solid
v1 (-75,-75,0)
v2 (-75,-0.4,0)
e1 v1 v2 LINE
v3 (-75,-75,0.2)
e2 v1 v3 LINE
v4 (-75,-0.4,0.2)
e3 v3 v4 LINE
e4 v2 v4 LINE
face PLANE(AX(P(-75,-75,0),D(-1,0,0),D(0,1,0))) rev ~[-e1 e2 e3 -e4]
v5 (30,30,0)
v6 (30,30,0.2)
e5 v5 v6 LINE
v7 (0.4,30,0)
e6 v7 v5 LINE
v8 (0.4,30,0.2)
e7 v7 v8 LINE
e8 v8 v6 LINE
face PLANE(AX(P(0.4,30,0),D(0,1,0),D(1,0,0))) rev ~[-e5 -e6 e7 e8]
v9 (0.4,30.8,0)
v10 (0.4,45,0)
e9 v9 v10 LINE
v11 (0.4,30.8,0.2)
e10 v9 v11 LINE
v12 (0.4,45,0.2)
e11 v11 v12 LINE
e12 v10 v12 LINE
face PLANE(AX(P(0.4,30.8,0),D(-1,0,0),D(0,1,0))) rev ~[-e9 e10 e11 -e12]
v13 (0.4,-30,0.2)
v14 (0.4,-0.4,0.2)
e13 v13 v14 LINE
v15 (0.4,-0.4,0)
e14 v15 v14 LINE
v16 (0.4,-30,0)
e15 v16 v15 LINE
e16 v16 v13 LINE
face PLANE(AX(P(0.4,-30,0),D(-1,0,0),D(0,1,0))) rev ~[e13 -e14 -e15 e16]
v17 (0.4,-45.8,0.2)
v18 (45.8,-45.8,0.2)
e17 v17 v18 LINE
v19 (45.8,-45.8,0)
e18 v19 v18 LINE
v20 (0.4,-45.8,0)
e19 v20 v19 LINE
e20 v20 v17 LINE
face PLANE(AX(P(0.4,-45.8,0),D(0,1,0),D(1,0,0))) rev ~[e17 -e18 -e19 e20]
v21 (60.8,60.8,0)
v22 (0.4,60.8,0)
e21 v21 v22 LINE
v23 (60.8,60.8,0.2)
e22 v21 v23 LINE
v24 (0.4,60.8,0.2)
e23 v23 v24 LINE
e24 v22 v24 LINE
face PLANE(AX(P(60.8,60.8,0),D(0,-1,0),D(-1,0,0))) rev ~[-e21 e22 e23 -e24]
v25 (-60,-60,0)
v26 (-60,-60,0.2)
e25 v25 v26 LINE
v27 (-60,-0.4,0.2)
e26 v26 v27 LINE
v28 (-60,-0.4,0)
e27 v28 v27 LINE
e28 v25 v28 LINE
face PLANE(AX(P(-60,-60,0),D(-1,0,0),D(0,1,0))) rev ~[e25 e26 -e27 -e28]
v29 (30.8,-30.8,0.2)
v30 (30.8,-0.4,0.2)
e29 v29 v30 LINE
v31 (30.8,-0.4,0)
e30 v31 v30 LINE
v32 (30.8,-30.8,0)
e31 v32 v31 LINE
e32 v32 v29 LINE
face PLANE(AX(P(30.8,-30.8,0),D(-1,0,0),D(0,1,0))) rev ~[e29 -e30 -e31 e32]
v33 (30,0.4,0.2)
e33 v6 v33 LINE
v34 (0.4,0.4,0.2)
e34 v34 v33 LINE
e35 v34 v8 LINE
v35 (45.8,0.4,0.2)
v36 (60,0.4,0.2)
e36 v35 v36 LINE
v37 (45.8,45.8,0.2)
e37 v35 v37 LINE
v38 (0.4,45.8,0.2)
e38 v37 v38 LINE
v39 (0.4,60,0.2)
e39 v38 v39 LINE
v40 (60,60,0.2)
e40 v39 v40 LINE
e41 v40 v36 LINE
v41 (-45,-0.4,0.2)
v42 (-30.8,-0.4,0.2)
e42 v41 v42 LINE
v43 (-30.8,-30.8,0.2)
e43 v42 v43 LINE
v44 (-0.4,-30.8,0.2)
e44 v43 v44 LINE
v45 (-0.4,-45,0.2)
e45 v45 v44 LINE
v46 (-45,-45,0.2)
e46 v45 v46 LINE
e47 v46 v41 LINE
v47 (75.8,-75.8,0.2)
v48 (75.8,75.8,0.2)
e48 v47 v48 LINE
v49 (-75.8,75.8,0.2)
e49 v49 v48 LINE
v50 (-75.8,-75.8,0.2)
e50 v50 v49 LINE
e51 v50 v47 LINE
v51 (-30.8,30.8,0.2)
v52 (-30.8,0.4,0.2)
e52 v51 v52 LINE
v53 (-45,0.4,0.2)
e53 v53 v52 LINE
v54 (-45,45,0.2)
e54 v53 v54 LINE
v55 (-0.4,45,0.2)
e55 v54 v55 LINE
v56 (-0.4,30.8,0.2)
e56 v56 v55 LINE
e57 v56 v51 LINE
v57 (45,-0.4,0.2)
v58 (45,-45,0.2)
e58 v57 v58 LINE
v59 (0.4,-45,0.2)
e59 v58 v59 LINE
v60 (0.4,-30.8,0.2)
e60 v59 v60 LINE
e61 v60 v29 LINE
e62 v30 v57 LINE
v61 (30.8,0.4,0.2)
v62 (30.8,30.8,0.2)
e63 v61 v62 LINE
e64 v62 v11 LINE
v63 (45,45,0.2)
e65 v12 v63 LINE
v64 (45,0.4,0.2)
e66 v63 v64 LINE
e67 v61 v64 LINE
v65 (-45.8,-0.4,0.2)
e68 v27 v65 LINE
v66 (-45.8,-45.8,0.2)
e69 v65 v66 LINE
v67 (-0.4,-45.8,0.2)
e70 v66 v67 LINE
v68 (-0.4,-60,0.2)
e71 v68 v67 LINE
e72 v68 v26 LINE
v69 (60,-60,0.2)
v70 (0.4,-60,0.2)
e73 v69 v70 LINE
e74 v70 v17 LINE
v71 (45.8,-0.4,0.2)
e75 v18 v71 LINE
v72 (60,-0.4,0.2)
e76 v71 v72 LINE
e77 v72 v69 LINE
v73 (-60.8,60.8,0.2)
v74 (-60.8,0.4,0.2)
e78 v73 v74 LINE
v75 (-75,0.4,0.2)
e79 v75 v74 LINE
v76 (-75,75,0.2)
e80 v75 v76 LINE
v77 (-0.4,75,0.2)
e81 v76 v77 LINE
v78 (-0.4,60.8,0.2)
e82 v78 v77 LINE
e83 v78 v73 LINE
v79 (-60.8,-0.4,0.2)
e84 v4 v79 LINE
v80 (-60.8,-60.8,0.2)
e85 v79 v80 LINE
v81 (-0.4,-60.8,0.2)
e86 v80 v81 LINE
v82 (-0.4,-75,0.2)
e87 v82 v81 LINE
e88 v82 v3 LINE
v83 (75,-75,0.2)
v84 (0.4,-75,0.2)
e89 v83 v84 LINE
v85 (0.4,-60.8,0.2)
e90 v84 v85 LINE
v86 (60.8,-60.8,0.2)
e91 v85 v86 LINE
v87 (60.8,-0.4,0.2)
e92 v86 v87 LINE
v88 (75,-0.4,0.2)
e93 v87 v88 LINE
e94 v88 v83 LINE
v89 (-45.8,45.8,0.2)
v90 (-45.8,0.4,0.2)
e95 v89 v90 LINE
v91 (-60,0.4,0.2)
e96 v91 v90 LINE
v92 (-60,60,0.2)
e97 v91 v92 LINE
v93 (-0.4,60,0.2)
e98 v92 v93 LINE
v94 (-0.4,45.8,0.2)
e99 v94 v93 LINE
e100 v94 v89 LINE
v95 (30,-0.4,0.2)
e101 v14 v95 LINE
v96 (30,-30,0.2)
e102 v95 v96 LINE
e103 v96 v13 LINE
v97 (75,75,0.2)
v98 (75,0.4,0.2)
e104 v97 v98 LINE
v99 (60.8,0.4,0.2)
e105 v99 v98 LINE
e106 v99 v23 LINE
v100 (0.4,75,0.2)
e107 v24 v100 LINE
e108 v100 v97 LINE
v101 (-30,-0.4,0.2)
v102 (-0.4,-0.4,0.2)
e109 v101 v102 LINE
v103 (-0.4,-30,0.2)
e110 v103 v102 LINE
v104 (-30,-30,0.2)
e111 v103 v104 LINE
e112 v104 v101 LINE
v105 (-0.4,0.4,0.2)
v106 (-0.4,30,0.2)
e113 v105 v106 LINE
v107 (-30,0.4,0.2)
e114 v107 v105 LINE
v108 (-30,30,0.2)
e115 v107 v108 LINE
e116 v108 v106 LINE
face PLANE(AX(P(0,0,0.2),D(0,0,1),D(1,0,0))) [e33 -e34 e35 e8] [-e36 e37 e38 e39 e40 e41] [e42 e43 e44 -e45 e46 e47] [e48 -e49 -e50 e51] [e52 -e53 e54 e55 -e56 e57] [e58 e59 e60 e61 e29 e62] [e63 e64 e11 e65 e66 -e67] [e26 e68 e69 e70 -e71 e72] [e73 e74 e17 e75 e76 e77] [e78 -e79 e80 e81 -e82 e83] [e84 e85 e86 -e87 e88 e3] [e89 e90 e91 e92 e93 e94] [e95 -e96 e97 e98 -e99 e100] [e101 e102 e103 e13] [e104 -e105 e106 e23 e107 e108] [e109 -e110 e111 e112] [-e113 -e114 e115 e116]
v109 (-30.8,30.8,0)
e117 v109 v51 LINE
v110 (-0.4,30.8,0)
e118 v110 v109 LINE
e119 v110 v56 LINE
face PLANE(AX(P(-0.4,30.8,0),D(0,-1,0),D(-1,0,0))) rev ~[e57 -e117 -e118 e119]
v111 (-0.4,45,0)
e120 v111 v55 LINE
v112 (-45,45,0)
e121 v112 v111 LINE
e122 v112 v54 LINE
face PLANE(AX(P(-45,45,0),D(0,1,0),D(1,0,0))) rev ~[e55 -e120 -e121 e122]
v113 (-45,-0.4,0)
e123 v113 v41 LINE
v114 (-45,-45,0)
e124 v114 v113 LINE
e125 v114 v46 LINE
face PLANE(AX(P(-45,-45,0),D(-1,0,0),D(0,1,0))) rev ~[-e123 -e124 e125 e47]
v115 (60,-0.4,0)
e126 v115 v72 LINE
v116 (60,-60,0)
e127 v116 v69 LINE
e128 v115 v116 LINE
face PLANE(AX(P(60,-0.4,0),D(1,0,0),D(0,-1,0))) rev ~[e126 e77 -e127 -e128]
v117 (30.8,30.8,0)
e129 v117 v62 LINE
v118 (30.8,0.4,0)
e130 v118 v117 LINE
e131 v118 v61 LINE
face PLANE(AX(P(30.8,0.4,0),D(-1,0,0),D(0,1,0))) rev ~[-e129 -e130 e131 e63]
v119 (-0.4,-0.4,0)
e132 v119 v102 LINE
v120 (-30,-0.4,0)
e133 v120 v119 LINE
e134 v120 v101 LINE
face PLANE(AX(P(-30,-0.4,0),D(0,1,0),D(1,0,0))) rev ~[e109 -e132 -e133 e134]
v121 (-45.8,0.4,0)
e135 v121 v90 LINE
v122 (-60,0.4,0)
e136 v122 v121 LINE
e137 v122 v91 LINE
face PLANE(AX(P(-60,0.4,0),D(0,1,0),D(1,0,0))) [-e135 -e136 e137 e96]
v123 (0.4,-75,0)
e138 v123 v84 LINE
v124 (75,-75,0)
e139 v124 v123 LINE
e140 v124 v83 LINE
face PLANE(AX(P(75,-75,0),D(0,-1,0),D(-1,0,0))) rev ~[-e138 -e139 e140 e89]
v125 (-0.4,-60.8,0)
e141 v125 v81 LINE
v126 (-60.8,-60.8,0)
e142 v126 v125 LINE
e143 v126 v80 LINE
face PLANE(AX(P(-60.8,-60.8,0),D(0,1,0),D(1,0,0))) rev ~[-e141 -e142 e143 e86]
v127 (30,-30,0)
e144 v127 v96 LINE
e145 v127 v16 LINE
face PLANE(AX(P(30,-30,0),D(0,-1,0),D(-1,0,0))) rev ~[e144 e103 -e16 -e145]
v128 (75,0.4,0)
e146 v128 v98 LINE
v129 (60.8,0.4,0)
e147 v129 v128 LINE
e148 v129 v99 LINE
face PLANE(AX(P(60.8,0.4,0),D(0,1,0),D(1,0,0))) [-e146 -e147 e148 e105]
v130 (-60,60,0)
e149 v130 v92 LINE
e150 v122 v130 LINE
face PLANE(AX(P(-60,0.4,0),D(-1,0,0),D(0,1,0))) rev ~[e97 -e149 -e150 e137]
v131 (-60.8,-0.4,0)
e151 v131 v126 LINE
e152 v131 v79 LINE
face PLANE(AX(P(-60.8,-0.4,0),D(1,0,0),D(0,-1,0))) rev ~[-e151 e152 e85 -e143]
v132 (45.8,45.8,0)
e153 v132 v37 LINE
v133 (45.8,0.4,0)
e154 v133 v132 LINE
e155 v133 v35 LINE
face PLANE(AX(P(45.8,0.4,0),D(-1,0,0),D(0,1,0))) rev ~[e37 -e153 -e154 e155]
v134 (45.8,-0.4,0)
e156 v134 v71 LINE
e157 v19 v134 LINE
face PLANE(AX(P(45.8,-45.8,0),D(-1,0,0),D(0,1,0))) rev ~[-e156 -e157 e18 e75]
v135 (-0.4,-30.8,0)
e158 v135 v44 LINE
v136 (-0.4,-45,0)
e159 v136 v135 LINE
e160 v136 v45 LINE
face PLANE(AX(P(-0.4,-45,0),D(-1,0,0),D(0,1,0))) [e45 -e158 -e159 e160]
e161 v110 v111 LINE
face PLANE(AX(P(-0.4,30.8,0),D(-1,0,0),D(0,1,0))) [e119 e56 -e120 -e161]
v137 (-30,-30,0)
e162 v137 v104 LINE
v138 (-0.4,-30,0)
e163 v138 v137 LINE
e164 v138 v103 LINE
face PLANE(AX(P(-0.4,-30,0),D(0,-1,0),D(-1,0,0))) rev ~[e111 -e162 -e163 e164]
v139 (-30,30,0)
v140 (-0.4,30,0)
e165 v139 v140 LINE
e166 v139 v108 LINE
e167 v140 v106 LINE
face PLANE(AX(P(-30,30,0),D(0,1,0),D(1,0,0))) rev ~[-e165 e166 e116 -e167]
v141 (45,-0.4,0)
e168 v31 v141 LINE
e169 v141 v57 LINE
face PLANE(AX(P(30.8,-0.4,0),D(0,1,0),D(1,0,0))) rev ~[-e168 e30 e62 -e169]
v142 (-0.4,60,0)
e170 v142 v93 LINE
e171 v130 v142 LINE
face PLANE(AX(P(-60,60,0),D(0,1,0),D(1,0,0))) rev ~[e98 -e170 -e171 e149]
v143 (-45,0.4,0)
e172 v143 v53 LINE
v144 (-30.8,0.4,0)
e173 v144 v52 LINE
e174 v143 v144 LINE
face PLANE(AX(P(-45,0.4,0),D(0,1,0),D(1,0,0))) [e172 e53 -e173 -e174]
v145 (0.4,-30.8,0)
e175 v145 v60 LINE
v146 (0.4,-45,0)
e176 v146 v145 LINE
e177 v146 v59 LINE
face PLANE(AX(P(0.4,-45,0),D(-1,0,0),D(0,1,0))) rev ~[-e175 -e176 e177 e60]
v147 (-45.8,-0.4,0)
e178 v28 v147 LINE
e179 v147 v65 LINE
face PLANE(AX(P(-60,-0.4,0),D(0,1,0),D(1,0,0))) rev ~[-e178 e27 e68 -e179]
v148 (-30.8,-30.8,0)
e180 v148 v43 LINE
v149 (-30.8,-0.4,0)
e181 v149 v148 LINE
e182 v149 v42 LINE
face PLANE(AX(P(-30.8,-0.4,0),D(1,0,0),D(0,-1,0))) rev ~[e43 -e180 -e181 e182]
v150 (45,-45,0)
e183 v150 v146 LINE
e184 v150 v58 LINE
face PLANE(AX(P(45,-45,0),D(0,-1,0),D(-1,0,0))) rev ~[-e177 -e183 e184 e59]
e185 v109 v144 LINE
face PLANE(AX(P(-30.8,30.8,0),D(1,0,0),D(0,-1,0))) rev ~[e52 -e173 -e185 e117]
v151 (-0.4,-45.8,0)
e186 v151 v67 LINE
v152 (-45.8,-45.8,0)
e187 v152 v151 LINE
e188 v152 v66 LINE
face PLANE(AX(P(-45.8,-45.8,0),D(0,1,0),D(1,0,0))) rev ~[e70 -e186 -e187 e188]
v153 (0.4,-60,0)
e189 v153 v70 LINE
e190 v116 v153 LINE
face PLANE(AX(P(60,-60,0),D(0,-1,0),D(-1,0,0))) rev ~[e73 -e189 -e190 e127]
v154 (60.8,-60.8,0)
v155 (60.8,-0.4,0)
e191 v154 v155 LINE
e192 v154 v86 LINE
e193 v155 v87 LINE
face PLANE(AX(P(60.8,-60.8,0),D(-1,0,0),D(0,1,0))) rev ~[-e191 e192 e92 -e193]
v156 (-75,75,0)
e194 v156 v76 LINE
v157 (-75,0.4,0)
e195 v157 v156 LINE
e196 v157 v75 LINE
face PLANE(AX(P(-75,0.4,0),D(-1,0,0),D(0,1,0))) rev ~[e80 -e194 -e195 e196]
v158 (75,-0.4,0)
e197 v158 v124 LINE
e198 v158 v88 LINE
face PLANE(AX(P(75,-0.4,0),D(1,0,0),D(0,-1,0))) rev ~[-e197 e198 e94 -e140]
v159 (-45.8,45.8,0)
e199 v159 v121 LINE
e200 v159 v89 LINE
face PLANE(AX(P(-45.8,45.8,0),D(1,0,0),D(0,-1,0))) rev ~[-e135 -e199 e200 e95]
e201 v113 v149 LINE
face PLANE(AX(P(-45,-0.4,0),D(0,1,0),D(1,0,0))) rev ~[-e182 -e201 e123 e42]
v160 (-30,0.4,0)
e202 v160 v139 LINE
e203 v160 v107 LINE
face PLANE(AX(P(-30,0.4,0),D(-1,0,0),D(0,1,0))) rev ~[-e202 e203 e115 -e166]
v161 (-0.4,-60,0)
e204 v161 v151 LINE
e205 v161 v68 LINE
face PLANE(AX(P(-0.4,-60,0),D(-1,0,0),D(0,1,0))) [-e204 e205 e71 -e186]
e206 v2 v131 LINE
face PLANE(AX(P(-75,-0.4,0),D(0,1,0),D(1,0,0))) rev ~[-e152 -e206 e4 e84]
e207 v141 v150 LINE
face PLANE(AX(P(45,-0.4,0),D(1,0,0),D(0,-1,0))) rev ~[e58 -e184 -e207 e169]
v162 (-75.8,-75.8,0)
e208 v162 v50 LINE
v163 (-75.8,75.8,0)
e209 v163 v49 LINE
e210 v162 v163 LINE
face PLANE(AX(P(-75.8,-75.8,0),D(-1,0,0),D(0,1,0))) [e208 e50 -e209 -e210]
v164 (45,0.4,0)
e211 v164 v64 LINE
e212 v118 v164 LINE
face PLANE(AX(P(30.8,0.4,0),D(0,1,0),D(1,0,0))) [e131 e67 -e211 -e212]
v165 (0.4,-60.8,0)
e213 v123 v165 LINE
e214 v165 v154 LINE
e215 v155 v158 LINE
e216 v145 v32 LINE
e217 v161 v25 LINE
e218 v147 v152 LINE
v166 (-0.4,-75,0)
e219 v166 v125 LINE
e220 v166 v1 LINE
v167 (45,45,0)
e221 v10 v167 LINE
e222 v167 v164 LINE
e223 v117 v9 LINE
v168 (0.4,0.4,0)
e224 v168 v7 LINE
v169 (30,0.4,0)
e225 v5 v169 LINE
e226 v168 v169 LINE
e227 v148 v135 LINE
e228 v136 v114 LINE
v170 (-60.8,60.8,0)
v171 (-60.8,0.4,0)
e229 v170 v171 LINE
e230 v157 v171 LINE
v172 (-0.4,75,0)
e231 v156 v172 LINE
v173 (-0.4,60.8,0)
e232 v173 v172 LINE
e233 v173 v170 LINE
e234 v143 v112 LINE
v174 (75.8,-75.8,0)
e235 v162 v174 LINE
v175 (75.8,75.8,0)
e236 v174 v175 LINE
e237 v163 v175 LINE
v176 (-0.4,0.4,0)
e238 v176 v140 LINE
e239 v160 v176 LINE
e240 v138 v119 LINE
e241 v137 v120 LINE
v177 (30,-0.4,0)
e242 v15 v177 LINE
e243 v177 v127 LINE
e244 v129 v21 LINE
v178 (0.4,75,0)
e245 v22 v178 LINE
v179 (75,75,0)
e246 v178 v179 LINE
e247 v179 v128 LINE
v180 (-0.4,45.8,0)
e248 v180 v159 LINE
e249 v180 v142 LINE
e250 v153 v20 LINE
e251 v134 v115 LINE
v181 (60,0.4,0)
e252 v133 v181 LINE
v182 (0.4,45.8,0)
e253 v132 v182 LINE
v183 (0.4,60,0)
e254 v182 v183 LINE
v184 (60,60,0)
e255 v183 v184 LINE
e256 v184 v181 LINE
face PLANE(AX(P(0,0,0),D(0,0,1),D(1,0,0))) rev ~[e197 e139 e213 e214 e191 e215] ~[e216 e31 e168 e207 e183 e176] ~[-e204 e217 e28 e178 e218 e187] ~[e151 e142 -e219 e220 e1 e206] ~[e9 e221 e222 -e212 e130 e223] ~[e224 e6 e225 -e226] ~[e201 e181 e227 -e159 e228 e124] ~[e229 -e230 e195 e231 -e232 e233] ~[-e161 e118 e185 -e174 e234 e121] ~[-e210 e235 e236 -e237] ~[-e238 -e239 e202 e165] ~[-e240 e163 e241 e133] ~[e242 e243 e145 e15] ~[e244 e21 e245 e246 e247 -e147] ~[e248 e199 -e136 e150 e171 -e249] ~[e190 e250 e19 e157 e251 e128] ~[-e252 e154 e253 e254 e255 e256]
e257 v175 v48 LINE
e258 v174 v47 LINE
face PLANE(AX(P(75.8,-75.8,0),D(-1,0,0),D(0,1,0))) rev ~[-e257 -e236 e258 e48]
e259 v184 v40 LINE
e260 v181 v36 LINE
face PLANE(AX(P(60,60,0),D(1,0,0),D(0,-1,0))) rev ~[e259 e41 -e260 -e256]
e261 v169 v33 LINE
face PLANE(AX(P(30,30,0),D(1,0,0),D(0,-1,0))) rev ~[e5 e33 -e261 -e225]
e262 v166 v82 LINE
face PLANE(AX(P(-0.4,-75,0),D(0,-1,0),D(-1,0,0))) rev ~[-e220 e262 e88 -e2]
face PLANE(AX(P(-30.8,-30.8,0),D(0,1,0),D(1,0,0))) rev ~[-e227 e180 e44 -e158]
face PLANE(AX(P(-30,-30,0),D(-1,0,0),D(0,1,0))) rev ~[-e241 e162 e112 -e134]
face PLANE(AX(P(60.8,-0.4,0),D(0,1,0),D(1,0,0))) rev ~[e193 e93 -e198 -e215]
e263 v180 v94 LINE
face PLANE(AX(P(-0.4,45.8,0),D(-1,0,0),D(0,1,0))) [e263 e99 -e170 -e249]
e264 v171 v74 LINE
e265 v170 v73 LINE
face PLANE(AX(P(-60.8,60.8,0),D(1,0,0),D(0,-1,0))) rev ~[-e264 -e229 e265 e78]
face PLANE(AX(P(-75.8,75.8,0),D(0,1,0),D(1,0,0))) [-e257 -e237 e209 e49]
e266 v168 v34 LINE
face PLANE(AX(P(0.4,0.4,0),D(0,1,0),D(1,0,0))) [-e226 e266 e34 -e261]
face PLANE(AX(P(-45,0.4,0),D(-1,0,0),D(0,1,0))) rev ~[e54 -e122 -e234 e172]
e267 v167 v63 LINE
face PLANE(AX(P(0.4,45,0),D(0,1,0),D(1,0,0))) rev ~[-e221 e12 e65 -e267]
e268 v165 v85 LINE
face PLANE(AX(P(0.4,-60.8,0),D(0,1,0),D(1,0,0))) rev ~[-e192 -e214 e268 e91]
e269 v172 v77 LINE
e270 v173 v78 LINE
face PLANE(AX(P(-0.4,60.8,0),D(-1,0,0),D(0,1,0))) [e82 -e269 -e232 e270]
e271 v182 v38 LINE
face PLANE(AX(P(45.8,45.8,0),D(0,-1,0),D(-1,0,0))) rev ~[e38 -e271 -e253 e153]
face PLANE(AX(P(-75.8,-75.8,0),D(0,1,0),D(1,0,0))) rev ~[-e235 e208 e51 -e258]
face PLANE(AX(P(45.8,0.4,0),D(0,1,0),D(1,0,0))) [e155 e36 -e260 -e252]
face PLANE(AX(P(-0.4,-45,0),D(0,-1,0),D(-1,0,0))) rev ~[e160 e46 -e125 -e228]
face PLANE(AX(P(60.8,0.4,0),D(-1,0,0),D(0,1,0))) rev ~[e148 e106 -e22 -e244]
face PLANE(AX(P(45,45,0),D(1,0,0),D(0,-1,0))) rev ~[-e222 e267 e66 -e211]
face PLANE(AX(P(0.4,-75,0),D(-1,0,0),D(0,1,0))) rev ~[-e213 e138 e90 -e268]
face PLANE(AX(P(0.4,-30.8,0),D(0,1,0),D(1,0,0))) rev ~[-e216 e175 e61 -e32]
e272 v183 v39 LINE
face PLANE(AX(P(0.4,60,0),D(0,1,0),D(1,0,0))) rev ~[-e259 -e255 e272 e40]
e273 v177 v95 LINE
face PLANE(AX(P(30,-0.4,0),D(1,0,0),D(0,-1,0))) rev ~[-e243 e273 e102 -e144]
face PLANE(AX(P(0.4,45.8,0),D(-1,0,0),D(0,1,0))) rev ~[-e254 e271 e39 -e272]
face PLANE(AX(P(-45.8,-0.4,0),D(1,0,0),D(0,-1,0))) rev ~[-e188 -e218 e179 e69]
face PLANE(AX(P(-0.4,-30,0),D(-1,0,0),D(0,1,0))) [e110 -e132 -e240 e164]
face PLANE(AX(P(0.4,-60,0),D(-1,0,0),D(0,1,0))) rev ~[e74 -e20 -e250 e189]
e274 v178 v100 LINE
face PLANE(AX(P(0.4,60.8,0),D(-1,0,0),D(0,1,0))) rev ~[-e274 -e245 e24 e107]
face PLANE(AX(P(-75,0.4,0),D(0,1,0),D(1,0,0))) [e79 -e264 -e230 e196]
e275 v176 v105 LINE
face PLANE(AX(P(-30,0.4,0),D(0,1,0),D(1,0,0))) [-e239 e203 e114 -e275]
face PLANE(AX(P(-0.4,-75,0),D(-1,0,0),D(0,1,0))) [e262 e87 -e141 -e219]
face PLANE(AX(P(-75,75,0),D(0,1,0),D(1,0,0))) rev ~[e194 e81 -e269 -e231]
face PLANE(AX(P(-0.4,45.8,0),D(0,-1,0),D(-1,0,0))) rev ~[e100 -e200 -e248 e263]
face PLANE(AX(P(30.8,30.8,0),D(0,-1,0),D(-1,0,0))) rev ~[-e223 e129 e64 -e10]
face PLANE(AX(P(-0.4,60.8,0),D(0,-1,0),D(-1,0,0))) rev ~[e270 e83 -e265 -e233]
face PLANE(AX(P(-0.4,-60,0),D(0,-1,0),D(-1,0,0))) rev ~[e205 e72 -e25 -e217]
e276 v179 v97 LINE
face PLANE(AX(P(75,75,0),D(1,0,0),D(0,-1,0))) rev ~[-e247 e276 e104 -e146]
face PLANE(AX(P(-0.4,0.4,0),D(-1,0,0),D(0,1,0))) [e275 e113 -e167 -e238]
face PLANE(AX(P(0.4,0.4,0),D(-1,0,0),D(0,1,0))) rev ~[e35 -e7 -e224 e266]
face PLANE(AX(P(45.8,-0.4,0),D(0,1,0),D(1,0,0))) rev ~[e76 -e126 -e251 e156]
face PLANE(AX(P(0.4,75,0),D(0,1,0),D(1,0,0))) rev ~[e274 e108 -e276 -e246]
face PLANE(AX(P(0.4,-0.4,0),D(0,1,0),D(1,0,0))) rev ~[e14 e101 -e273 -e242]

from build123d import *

# Parameters (mm, degrees)
F0_W     = 151.6
F0_H     = 151.6
F0_W_2   = 29.6
F0_H_2   = 0.4
F0_W_3   = 0.4
F0_H_3   = 29.6
F0_W_4   = 14.2
F0_H_4   = 14.2
F0_W_5   = 0.8
F0_H_5   = 0.8
F1_DEPTH = 0.2


with BuildPart() as f1:
    # F0 (on Top) → F1 (new body)
    with BuildSketch(Plane.XY):
        Rectangle(F0_W, F0_H)
        Polygon((75, -0.4), (75, -75), (0.4, -75), (0, -75), (-0.4, -75), (-75, -75), (-75, -0.4), (-75, 0), (-75, 0.4), (-75, 75), (-0.4, 75), (0, 75), (0.4, 75), (75, 75), (75, 0.4), (75, 0), align=None, mode=Mode.SUBTRACT)
        Polygon((-60.8, 60.8), (-60.8, 0.4), (-60, 0.4), (-60, 60), (-0.4, 60), (-0.4, 60.8), align=None)
        Polygon((0.4, -60), (0.4, -60.8), (60.8, -60.8), (60.8, -0.4), (60, -0.4), (60, -60), align=None)
        Polygon((-60.8, -60.8), (-0.4, -60.8), (-0.4, -60), (-60, -60), (-60, -0.4), (-60.8, -0.4), align=None)
        Polygon((60, 0.4), (60.8, 0.4), (60.8, 60.8), (0.4, 60.8), (0.4, 60), (60, 60), align=None)
        Polygon((-45.8, 45.8), (-45.8, 0.4), (-45, 0.4), (-45, 45), (-0.4, 45), (-0.4, 45.8), align=None)
        Polygon((45, 0.4), (45.8, 0.4), (45.8, 45.8), (0.4, 45.8), (0.4, 45), (45, 45), align=None)
        Polygon((-45.8, -45.8), (-0.4, -45.8), (-0.4, -45), (-45, -45), (-45, -0.4), (-45.8, -0.4), align=None)
        Polygon((0.4, -45), (0.4, -45.8), (45.8, -45.8), (45.8, -0.4), (45, -0.4), (45, -45), align=None)
        Polygon((-30.8, 30.8), (-30.8, 0.4), (-30, 0.4), (-30, 30), (-0.4, 30), (-0.4, 30.8), align=None)
        Polygon((-30.8, -30.8), (-0.4, -30.8), (-0.4, -30), (-30, -30), (-30, -0.4), (-30.8, -0.4), align=None)
        Polygon((30, 0.4), (30.8, 0.4), (30.8, 30.8), (0.4, 30.8), (0.4, 30), (30, 30), align=None)
        Polygon((0.4, -30), (0.4, -30.8), (30.8, -30.8), (30.8, -0.4), (30, -0.4), (30, -30), align=None)
        with Locations((15.2, 0.2)):
            Rectangle(F0_W_2, F0_H_2)
        with Locations((-15.2, 0.2)):
            Rectangle(F0_W_2, F0_H_2)
        with Locations((15.2, -0.2)):
            Rectangle(F0_W_2, F0_H_2)
        with Locations((-0.2, 15.2)):
            Rectangle(F0_W_3, F0_H_3)
        with Locations((-15.2, -0.2)):
            Rectangle(F0_W_2, F0_H_2)
        with Locations((-0.2, -15.2)):
            Rectangle(F0_W_3, F0_H_3)
        with Locations((0.2, -15.2)):
            Rectangle(F0_W_3, F0_H_3)
        with Locations((0.2, 15.2)):
            Rectangle(F0_W_3, F0_H_3)
        with Locations((-52.9, -0.2)):
            Rectangle(F0_W_4, F0_H_2)
        with Locations((52.9, -0.2)):
            Rectangle(F0_W_4, F0_H_2)
        with Locations((-37.9, -0.2)):
            Rectangle(F0_W_4, F0_H_2)
        with Locations((67.9, 0.2)):
            Rectangle(F0_W_4, F0_H_2)
        with Locations((-67.9, 0.2)):
            Rectangle(F0_W_4, F0_H_2)
        with Locations((-52.9, 0.2)):
            Rectangle(F0_W_4, F0_H_2)
        with Locations((37.9, 0.2)):
            Rectangle(F0_W_4, F0_H_2)
        with Locations((52.9, 0.2)):
            Rectangle(F0_W_4, F0_H_2)
        with Locations((-37.9, 0.2)):
            Rectangle(F0_W_4, F0_H_2)
        with Locations((0.2, -67.9)):
            Rectangle(F0_W_3, F0_H_4)
        with Locations((-67.9, -0.2)):
            Rectangle(F0_W_4, F0_H_2)
        with Locations((-0.2, 52.9)):
            Rectangle(F0_W_3, F0_H_4)
        with Locations((-0.2, -52.9)):
            Rectangle(F0_W_3, F0_H_4)
        with Locations((0.2, 67.9)):
            Rectangle(F0_W_3, F0_H_4)
        with Locations((67.9, -0.2)):
            Rectangle(F0_W_4, F0_H_2)
        with Locations((0.2, -37.9)):
            Rectangle(F0_W_3, F0_H_4)
        with Locations((0.2, 37.9)):
            Rectangle(F0_W_3, F0_H_4)
        with Locations((37.9, -0.2)):
            Rectangle(F0_W_4, F0_H_2)
        with Locations((0.2, 52.9)):
            Rectangle(F0_W_3, F0_H_4)
        with Locations((-0.2, 37.9)):
            Rectangle(F0_W_3, F0_H_4)
        with Locations((-0.2, -37.9)):
            Rectangle(F0_W_3, F0_H_4)
        with Locations((-0.2, -67.9)):
            Rectangle(F0_W_3, F0_H_4)
        with Locations((-0.2, 67.9)):
            Rectangle(F0_W_3, F0_H_4)
        with Locations((0.2, -52.9)):
            Rectangle(F0_W_3, F0_H_4)
        with Locations((-45.4, 0.2)):
            Rectangle(F0_W_5, F0_H_2)
        with Locations((-60.4, -0.2)):
            Rectangle(F0_W_5, F0_H_2)
        with Locations((30.4, -0.2)):
            Rectangle(F0_W_5, F0_H_2)
        with Locations((-60.4, 0.2)):
            Rectangle(F0_W_5, F0_H_2)
        with Locations((60.4, 0.2)):
            Rectangle(F0_W_5, F0_H_2)
        with Locations((45.4, 0.2)):
            Rectangle(F0_W_5, F0_H_2)
        with Locations((-45.4, -0.2)):
            Rectangle(F0_W_5, F0_H_2)
        with Locations((-30.4, -0.2)):
            Rectangle(F0_W_5, F0_H_2)
        with Locations((-0.2, 45.4)):
            Rectangle(F0_W_3, F0_H_5)
        with Locations((-0.2, -30.4)):
            Rectangle(F0_W_3, F0_H_5)
        with Locations((60.4, -0.2)):
            Rectangle(F0_W_5, F0_H_2)
        with Locations((0.2, 60.4)):
            Rectangle(F0_W_3, F0_H_5)
        with Locations((0.2, -60.4)):
            Rectangle(F0_W_3, F0_H_5)
        with Locations((-30.4, 0.2)):
            Rectangle(F0_W_5, F0_H_2)
        with Locations((30.4, 0.2)):
            Rectangle(F0_W_5, F0_H_2)
        with Locations((-0.2, -60.4)):
            Rectangle(F0_W_3, F0_H_5)
        with Locations((-0.2, 60.4)):
            Rectangle(F0_W_3, F0_H_5)
        with Locations((-0.2, -45.4)):
            Rectangle(F0_W_3, F0_H_5)
        with Locations((0.2, 30.4)):
            Rectangle(F0_W_3, F0_H_5)
        with Locations((0.2, -30.4)):
            Rectangle(F0_W_3, F0_H_5)
        with Locations((45.4, -0.2)):
            Rectangle(F0_W_5, F0_H_2)
        with Locations((0.2, -45.4)):
            Rectangle(F0_W_3, F0_H_5)
        with Locations((0.2, 45.4)):
            Rectangle(F0_W_3, F0_H_5)
        with Locations((-0.2, 30.4)):
            Rectangle(F0_W_3, F0_H_5)
        with Locations((-0.2, 0.2)):
            Rectangle(F0_W_3, F0_H_2)
        with Locations((-0.2, -0.2)):
            Rectangle(F0_W_3, F0_H_2)
        with Locations((0.2, 0.2)):
            Rectangle(F0_W_3, F0_H_2)
        with Locations((0.2, -0.2)):
            Rectangle(F0_W_3, F0_H_2)
    extrude(amount=F1_DEPTH)


solid = f1.part
